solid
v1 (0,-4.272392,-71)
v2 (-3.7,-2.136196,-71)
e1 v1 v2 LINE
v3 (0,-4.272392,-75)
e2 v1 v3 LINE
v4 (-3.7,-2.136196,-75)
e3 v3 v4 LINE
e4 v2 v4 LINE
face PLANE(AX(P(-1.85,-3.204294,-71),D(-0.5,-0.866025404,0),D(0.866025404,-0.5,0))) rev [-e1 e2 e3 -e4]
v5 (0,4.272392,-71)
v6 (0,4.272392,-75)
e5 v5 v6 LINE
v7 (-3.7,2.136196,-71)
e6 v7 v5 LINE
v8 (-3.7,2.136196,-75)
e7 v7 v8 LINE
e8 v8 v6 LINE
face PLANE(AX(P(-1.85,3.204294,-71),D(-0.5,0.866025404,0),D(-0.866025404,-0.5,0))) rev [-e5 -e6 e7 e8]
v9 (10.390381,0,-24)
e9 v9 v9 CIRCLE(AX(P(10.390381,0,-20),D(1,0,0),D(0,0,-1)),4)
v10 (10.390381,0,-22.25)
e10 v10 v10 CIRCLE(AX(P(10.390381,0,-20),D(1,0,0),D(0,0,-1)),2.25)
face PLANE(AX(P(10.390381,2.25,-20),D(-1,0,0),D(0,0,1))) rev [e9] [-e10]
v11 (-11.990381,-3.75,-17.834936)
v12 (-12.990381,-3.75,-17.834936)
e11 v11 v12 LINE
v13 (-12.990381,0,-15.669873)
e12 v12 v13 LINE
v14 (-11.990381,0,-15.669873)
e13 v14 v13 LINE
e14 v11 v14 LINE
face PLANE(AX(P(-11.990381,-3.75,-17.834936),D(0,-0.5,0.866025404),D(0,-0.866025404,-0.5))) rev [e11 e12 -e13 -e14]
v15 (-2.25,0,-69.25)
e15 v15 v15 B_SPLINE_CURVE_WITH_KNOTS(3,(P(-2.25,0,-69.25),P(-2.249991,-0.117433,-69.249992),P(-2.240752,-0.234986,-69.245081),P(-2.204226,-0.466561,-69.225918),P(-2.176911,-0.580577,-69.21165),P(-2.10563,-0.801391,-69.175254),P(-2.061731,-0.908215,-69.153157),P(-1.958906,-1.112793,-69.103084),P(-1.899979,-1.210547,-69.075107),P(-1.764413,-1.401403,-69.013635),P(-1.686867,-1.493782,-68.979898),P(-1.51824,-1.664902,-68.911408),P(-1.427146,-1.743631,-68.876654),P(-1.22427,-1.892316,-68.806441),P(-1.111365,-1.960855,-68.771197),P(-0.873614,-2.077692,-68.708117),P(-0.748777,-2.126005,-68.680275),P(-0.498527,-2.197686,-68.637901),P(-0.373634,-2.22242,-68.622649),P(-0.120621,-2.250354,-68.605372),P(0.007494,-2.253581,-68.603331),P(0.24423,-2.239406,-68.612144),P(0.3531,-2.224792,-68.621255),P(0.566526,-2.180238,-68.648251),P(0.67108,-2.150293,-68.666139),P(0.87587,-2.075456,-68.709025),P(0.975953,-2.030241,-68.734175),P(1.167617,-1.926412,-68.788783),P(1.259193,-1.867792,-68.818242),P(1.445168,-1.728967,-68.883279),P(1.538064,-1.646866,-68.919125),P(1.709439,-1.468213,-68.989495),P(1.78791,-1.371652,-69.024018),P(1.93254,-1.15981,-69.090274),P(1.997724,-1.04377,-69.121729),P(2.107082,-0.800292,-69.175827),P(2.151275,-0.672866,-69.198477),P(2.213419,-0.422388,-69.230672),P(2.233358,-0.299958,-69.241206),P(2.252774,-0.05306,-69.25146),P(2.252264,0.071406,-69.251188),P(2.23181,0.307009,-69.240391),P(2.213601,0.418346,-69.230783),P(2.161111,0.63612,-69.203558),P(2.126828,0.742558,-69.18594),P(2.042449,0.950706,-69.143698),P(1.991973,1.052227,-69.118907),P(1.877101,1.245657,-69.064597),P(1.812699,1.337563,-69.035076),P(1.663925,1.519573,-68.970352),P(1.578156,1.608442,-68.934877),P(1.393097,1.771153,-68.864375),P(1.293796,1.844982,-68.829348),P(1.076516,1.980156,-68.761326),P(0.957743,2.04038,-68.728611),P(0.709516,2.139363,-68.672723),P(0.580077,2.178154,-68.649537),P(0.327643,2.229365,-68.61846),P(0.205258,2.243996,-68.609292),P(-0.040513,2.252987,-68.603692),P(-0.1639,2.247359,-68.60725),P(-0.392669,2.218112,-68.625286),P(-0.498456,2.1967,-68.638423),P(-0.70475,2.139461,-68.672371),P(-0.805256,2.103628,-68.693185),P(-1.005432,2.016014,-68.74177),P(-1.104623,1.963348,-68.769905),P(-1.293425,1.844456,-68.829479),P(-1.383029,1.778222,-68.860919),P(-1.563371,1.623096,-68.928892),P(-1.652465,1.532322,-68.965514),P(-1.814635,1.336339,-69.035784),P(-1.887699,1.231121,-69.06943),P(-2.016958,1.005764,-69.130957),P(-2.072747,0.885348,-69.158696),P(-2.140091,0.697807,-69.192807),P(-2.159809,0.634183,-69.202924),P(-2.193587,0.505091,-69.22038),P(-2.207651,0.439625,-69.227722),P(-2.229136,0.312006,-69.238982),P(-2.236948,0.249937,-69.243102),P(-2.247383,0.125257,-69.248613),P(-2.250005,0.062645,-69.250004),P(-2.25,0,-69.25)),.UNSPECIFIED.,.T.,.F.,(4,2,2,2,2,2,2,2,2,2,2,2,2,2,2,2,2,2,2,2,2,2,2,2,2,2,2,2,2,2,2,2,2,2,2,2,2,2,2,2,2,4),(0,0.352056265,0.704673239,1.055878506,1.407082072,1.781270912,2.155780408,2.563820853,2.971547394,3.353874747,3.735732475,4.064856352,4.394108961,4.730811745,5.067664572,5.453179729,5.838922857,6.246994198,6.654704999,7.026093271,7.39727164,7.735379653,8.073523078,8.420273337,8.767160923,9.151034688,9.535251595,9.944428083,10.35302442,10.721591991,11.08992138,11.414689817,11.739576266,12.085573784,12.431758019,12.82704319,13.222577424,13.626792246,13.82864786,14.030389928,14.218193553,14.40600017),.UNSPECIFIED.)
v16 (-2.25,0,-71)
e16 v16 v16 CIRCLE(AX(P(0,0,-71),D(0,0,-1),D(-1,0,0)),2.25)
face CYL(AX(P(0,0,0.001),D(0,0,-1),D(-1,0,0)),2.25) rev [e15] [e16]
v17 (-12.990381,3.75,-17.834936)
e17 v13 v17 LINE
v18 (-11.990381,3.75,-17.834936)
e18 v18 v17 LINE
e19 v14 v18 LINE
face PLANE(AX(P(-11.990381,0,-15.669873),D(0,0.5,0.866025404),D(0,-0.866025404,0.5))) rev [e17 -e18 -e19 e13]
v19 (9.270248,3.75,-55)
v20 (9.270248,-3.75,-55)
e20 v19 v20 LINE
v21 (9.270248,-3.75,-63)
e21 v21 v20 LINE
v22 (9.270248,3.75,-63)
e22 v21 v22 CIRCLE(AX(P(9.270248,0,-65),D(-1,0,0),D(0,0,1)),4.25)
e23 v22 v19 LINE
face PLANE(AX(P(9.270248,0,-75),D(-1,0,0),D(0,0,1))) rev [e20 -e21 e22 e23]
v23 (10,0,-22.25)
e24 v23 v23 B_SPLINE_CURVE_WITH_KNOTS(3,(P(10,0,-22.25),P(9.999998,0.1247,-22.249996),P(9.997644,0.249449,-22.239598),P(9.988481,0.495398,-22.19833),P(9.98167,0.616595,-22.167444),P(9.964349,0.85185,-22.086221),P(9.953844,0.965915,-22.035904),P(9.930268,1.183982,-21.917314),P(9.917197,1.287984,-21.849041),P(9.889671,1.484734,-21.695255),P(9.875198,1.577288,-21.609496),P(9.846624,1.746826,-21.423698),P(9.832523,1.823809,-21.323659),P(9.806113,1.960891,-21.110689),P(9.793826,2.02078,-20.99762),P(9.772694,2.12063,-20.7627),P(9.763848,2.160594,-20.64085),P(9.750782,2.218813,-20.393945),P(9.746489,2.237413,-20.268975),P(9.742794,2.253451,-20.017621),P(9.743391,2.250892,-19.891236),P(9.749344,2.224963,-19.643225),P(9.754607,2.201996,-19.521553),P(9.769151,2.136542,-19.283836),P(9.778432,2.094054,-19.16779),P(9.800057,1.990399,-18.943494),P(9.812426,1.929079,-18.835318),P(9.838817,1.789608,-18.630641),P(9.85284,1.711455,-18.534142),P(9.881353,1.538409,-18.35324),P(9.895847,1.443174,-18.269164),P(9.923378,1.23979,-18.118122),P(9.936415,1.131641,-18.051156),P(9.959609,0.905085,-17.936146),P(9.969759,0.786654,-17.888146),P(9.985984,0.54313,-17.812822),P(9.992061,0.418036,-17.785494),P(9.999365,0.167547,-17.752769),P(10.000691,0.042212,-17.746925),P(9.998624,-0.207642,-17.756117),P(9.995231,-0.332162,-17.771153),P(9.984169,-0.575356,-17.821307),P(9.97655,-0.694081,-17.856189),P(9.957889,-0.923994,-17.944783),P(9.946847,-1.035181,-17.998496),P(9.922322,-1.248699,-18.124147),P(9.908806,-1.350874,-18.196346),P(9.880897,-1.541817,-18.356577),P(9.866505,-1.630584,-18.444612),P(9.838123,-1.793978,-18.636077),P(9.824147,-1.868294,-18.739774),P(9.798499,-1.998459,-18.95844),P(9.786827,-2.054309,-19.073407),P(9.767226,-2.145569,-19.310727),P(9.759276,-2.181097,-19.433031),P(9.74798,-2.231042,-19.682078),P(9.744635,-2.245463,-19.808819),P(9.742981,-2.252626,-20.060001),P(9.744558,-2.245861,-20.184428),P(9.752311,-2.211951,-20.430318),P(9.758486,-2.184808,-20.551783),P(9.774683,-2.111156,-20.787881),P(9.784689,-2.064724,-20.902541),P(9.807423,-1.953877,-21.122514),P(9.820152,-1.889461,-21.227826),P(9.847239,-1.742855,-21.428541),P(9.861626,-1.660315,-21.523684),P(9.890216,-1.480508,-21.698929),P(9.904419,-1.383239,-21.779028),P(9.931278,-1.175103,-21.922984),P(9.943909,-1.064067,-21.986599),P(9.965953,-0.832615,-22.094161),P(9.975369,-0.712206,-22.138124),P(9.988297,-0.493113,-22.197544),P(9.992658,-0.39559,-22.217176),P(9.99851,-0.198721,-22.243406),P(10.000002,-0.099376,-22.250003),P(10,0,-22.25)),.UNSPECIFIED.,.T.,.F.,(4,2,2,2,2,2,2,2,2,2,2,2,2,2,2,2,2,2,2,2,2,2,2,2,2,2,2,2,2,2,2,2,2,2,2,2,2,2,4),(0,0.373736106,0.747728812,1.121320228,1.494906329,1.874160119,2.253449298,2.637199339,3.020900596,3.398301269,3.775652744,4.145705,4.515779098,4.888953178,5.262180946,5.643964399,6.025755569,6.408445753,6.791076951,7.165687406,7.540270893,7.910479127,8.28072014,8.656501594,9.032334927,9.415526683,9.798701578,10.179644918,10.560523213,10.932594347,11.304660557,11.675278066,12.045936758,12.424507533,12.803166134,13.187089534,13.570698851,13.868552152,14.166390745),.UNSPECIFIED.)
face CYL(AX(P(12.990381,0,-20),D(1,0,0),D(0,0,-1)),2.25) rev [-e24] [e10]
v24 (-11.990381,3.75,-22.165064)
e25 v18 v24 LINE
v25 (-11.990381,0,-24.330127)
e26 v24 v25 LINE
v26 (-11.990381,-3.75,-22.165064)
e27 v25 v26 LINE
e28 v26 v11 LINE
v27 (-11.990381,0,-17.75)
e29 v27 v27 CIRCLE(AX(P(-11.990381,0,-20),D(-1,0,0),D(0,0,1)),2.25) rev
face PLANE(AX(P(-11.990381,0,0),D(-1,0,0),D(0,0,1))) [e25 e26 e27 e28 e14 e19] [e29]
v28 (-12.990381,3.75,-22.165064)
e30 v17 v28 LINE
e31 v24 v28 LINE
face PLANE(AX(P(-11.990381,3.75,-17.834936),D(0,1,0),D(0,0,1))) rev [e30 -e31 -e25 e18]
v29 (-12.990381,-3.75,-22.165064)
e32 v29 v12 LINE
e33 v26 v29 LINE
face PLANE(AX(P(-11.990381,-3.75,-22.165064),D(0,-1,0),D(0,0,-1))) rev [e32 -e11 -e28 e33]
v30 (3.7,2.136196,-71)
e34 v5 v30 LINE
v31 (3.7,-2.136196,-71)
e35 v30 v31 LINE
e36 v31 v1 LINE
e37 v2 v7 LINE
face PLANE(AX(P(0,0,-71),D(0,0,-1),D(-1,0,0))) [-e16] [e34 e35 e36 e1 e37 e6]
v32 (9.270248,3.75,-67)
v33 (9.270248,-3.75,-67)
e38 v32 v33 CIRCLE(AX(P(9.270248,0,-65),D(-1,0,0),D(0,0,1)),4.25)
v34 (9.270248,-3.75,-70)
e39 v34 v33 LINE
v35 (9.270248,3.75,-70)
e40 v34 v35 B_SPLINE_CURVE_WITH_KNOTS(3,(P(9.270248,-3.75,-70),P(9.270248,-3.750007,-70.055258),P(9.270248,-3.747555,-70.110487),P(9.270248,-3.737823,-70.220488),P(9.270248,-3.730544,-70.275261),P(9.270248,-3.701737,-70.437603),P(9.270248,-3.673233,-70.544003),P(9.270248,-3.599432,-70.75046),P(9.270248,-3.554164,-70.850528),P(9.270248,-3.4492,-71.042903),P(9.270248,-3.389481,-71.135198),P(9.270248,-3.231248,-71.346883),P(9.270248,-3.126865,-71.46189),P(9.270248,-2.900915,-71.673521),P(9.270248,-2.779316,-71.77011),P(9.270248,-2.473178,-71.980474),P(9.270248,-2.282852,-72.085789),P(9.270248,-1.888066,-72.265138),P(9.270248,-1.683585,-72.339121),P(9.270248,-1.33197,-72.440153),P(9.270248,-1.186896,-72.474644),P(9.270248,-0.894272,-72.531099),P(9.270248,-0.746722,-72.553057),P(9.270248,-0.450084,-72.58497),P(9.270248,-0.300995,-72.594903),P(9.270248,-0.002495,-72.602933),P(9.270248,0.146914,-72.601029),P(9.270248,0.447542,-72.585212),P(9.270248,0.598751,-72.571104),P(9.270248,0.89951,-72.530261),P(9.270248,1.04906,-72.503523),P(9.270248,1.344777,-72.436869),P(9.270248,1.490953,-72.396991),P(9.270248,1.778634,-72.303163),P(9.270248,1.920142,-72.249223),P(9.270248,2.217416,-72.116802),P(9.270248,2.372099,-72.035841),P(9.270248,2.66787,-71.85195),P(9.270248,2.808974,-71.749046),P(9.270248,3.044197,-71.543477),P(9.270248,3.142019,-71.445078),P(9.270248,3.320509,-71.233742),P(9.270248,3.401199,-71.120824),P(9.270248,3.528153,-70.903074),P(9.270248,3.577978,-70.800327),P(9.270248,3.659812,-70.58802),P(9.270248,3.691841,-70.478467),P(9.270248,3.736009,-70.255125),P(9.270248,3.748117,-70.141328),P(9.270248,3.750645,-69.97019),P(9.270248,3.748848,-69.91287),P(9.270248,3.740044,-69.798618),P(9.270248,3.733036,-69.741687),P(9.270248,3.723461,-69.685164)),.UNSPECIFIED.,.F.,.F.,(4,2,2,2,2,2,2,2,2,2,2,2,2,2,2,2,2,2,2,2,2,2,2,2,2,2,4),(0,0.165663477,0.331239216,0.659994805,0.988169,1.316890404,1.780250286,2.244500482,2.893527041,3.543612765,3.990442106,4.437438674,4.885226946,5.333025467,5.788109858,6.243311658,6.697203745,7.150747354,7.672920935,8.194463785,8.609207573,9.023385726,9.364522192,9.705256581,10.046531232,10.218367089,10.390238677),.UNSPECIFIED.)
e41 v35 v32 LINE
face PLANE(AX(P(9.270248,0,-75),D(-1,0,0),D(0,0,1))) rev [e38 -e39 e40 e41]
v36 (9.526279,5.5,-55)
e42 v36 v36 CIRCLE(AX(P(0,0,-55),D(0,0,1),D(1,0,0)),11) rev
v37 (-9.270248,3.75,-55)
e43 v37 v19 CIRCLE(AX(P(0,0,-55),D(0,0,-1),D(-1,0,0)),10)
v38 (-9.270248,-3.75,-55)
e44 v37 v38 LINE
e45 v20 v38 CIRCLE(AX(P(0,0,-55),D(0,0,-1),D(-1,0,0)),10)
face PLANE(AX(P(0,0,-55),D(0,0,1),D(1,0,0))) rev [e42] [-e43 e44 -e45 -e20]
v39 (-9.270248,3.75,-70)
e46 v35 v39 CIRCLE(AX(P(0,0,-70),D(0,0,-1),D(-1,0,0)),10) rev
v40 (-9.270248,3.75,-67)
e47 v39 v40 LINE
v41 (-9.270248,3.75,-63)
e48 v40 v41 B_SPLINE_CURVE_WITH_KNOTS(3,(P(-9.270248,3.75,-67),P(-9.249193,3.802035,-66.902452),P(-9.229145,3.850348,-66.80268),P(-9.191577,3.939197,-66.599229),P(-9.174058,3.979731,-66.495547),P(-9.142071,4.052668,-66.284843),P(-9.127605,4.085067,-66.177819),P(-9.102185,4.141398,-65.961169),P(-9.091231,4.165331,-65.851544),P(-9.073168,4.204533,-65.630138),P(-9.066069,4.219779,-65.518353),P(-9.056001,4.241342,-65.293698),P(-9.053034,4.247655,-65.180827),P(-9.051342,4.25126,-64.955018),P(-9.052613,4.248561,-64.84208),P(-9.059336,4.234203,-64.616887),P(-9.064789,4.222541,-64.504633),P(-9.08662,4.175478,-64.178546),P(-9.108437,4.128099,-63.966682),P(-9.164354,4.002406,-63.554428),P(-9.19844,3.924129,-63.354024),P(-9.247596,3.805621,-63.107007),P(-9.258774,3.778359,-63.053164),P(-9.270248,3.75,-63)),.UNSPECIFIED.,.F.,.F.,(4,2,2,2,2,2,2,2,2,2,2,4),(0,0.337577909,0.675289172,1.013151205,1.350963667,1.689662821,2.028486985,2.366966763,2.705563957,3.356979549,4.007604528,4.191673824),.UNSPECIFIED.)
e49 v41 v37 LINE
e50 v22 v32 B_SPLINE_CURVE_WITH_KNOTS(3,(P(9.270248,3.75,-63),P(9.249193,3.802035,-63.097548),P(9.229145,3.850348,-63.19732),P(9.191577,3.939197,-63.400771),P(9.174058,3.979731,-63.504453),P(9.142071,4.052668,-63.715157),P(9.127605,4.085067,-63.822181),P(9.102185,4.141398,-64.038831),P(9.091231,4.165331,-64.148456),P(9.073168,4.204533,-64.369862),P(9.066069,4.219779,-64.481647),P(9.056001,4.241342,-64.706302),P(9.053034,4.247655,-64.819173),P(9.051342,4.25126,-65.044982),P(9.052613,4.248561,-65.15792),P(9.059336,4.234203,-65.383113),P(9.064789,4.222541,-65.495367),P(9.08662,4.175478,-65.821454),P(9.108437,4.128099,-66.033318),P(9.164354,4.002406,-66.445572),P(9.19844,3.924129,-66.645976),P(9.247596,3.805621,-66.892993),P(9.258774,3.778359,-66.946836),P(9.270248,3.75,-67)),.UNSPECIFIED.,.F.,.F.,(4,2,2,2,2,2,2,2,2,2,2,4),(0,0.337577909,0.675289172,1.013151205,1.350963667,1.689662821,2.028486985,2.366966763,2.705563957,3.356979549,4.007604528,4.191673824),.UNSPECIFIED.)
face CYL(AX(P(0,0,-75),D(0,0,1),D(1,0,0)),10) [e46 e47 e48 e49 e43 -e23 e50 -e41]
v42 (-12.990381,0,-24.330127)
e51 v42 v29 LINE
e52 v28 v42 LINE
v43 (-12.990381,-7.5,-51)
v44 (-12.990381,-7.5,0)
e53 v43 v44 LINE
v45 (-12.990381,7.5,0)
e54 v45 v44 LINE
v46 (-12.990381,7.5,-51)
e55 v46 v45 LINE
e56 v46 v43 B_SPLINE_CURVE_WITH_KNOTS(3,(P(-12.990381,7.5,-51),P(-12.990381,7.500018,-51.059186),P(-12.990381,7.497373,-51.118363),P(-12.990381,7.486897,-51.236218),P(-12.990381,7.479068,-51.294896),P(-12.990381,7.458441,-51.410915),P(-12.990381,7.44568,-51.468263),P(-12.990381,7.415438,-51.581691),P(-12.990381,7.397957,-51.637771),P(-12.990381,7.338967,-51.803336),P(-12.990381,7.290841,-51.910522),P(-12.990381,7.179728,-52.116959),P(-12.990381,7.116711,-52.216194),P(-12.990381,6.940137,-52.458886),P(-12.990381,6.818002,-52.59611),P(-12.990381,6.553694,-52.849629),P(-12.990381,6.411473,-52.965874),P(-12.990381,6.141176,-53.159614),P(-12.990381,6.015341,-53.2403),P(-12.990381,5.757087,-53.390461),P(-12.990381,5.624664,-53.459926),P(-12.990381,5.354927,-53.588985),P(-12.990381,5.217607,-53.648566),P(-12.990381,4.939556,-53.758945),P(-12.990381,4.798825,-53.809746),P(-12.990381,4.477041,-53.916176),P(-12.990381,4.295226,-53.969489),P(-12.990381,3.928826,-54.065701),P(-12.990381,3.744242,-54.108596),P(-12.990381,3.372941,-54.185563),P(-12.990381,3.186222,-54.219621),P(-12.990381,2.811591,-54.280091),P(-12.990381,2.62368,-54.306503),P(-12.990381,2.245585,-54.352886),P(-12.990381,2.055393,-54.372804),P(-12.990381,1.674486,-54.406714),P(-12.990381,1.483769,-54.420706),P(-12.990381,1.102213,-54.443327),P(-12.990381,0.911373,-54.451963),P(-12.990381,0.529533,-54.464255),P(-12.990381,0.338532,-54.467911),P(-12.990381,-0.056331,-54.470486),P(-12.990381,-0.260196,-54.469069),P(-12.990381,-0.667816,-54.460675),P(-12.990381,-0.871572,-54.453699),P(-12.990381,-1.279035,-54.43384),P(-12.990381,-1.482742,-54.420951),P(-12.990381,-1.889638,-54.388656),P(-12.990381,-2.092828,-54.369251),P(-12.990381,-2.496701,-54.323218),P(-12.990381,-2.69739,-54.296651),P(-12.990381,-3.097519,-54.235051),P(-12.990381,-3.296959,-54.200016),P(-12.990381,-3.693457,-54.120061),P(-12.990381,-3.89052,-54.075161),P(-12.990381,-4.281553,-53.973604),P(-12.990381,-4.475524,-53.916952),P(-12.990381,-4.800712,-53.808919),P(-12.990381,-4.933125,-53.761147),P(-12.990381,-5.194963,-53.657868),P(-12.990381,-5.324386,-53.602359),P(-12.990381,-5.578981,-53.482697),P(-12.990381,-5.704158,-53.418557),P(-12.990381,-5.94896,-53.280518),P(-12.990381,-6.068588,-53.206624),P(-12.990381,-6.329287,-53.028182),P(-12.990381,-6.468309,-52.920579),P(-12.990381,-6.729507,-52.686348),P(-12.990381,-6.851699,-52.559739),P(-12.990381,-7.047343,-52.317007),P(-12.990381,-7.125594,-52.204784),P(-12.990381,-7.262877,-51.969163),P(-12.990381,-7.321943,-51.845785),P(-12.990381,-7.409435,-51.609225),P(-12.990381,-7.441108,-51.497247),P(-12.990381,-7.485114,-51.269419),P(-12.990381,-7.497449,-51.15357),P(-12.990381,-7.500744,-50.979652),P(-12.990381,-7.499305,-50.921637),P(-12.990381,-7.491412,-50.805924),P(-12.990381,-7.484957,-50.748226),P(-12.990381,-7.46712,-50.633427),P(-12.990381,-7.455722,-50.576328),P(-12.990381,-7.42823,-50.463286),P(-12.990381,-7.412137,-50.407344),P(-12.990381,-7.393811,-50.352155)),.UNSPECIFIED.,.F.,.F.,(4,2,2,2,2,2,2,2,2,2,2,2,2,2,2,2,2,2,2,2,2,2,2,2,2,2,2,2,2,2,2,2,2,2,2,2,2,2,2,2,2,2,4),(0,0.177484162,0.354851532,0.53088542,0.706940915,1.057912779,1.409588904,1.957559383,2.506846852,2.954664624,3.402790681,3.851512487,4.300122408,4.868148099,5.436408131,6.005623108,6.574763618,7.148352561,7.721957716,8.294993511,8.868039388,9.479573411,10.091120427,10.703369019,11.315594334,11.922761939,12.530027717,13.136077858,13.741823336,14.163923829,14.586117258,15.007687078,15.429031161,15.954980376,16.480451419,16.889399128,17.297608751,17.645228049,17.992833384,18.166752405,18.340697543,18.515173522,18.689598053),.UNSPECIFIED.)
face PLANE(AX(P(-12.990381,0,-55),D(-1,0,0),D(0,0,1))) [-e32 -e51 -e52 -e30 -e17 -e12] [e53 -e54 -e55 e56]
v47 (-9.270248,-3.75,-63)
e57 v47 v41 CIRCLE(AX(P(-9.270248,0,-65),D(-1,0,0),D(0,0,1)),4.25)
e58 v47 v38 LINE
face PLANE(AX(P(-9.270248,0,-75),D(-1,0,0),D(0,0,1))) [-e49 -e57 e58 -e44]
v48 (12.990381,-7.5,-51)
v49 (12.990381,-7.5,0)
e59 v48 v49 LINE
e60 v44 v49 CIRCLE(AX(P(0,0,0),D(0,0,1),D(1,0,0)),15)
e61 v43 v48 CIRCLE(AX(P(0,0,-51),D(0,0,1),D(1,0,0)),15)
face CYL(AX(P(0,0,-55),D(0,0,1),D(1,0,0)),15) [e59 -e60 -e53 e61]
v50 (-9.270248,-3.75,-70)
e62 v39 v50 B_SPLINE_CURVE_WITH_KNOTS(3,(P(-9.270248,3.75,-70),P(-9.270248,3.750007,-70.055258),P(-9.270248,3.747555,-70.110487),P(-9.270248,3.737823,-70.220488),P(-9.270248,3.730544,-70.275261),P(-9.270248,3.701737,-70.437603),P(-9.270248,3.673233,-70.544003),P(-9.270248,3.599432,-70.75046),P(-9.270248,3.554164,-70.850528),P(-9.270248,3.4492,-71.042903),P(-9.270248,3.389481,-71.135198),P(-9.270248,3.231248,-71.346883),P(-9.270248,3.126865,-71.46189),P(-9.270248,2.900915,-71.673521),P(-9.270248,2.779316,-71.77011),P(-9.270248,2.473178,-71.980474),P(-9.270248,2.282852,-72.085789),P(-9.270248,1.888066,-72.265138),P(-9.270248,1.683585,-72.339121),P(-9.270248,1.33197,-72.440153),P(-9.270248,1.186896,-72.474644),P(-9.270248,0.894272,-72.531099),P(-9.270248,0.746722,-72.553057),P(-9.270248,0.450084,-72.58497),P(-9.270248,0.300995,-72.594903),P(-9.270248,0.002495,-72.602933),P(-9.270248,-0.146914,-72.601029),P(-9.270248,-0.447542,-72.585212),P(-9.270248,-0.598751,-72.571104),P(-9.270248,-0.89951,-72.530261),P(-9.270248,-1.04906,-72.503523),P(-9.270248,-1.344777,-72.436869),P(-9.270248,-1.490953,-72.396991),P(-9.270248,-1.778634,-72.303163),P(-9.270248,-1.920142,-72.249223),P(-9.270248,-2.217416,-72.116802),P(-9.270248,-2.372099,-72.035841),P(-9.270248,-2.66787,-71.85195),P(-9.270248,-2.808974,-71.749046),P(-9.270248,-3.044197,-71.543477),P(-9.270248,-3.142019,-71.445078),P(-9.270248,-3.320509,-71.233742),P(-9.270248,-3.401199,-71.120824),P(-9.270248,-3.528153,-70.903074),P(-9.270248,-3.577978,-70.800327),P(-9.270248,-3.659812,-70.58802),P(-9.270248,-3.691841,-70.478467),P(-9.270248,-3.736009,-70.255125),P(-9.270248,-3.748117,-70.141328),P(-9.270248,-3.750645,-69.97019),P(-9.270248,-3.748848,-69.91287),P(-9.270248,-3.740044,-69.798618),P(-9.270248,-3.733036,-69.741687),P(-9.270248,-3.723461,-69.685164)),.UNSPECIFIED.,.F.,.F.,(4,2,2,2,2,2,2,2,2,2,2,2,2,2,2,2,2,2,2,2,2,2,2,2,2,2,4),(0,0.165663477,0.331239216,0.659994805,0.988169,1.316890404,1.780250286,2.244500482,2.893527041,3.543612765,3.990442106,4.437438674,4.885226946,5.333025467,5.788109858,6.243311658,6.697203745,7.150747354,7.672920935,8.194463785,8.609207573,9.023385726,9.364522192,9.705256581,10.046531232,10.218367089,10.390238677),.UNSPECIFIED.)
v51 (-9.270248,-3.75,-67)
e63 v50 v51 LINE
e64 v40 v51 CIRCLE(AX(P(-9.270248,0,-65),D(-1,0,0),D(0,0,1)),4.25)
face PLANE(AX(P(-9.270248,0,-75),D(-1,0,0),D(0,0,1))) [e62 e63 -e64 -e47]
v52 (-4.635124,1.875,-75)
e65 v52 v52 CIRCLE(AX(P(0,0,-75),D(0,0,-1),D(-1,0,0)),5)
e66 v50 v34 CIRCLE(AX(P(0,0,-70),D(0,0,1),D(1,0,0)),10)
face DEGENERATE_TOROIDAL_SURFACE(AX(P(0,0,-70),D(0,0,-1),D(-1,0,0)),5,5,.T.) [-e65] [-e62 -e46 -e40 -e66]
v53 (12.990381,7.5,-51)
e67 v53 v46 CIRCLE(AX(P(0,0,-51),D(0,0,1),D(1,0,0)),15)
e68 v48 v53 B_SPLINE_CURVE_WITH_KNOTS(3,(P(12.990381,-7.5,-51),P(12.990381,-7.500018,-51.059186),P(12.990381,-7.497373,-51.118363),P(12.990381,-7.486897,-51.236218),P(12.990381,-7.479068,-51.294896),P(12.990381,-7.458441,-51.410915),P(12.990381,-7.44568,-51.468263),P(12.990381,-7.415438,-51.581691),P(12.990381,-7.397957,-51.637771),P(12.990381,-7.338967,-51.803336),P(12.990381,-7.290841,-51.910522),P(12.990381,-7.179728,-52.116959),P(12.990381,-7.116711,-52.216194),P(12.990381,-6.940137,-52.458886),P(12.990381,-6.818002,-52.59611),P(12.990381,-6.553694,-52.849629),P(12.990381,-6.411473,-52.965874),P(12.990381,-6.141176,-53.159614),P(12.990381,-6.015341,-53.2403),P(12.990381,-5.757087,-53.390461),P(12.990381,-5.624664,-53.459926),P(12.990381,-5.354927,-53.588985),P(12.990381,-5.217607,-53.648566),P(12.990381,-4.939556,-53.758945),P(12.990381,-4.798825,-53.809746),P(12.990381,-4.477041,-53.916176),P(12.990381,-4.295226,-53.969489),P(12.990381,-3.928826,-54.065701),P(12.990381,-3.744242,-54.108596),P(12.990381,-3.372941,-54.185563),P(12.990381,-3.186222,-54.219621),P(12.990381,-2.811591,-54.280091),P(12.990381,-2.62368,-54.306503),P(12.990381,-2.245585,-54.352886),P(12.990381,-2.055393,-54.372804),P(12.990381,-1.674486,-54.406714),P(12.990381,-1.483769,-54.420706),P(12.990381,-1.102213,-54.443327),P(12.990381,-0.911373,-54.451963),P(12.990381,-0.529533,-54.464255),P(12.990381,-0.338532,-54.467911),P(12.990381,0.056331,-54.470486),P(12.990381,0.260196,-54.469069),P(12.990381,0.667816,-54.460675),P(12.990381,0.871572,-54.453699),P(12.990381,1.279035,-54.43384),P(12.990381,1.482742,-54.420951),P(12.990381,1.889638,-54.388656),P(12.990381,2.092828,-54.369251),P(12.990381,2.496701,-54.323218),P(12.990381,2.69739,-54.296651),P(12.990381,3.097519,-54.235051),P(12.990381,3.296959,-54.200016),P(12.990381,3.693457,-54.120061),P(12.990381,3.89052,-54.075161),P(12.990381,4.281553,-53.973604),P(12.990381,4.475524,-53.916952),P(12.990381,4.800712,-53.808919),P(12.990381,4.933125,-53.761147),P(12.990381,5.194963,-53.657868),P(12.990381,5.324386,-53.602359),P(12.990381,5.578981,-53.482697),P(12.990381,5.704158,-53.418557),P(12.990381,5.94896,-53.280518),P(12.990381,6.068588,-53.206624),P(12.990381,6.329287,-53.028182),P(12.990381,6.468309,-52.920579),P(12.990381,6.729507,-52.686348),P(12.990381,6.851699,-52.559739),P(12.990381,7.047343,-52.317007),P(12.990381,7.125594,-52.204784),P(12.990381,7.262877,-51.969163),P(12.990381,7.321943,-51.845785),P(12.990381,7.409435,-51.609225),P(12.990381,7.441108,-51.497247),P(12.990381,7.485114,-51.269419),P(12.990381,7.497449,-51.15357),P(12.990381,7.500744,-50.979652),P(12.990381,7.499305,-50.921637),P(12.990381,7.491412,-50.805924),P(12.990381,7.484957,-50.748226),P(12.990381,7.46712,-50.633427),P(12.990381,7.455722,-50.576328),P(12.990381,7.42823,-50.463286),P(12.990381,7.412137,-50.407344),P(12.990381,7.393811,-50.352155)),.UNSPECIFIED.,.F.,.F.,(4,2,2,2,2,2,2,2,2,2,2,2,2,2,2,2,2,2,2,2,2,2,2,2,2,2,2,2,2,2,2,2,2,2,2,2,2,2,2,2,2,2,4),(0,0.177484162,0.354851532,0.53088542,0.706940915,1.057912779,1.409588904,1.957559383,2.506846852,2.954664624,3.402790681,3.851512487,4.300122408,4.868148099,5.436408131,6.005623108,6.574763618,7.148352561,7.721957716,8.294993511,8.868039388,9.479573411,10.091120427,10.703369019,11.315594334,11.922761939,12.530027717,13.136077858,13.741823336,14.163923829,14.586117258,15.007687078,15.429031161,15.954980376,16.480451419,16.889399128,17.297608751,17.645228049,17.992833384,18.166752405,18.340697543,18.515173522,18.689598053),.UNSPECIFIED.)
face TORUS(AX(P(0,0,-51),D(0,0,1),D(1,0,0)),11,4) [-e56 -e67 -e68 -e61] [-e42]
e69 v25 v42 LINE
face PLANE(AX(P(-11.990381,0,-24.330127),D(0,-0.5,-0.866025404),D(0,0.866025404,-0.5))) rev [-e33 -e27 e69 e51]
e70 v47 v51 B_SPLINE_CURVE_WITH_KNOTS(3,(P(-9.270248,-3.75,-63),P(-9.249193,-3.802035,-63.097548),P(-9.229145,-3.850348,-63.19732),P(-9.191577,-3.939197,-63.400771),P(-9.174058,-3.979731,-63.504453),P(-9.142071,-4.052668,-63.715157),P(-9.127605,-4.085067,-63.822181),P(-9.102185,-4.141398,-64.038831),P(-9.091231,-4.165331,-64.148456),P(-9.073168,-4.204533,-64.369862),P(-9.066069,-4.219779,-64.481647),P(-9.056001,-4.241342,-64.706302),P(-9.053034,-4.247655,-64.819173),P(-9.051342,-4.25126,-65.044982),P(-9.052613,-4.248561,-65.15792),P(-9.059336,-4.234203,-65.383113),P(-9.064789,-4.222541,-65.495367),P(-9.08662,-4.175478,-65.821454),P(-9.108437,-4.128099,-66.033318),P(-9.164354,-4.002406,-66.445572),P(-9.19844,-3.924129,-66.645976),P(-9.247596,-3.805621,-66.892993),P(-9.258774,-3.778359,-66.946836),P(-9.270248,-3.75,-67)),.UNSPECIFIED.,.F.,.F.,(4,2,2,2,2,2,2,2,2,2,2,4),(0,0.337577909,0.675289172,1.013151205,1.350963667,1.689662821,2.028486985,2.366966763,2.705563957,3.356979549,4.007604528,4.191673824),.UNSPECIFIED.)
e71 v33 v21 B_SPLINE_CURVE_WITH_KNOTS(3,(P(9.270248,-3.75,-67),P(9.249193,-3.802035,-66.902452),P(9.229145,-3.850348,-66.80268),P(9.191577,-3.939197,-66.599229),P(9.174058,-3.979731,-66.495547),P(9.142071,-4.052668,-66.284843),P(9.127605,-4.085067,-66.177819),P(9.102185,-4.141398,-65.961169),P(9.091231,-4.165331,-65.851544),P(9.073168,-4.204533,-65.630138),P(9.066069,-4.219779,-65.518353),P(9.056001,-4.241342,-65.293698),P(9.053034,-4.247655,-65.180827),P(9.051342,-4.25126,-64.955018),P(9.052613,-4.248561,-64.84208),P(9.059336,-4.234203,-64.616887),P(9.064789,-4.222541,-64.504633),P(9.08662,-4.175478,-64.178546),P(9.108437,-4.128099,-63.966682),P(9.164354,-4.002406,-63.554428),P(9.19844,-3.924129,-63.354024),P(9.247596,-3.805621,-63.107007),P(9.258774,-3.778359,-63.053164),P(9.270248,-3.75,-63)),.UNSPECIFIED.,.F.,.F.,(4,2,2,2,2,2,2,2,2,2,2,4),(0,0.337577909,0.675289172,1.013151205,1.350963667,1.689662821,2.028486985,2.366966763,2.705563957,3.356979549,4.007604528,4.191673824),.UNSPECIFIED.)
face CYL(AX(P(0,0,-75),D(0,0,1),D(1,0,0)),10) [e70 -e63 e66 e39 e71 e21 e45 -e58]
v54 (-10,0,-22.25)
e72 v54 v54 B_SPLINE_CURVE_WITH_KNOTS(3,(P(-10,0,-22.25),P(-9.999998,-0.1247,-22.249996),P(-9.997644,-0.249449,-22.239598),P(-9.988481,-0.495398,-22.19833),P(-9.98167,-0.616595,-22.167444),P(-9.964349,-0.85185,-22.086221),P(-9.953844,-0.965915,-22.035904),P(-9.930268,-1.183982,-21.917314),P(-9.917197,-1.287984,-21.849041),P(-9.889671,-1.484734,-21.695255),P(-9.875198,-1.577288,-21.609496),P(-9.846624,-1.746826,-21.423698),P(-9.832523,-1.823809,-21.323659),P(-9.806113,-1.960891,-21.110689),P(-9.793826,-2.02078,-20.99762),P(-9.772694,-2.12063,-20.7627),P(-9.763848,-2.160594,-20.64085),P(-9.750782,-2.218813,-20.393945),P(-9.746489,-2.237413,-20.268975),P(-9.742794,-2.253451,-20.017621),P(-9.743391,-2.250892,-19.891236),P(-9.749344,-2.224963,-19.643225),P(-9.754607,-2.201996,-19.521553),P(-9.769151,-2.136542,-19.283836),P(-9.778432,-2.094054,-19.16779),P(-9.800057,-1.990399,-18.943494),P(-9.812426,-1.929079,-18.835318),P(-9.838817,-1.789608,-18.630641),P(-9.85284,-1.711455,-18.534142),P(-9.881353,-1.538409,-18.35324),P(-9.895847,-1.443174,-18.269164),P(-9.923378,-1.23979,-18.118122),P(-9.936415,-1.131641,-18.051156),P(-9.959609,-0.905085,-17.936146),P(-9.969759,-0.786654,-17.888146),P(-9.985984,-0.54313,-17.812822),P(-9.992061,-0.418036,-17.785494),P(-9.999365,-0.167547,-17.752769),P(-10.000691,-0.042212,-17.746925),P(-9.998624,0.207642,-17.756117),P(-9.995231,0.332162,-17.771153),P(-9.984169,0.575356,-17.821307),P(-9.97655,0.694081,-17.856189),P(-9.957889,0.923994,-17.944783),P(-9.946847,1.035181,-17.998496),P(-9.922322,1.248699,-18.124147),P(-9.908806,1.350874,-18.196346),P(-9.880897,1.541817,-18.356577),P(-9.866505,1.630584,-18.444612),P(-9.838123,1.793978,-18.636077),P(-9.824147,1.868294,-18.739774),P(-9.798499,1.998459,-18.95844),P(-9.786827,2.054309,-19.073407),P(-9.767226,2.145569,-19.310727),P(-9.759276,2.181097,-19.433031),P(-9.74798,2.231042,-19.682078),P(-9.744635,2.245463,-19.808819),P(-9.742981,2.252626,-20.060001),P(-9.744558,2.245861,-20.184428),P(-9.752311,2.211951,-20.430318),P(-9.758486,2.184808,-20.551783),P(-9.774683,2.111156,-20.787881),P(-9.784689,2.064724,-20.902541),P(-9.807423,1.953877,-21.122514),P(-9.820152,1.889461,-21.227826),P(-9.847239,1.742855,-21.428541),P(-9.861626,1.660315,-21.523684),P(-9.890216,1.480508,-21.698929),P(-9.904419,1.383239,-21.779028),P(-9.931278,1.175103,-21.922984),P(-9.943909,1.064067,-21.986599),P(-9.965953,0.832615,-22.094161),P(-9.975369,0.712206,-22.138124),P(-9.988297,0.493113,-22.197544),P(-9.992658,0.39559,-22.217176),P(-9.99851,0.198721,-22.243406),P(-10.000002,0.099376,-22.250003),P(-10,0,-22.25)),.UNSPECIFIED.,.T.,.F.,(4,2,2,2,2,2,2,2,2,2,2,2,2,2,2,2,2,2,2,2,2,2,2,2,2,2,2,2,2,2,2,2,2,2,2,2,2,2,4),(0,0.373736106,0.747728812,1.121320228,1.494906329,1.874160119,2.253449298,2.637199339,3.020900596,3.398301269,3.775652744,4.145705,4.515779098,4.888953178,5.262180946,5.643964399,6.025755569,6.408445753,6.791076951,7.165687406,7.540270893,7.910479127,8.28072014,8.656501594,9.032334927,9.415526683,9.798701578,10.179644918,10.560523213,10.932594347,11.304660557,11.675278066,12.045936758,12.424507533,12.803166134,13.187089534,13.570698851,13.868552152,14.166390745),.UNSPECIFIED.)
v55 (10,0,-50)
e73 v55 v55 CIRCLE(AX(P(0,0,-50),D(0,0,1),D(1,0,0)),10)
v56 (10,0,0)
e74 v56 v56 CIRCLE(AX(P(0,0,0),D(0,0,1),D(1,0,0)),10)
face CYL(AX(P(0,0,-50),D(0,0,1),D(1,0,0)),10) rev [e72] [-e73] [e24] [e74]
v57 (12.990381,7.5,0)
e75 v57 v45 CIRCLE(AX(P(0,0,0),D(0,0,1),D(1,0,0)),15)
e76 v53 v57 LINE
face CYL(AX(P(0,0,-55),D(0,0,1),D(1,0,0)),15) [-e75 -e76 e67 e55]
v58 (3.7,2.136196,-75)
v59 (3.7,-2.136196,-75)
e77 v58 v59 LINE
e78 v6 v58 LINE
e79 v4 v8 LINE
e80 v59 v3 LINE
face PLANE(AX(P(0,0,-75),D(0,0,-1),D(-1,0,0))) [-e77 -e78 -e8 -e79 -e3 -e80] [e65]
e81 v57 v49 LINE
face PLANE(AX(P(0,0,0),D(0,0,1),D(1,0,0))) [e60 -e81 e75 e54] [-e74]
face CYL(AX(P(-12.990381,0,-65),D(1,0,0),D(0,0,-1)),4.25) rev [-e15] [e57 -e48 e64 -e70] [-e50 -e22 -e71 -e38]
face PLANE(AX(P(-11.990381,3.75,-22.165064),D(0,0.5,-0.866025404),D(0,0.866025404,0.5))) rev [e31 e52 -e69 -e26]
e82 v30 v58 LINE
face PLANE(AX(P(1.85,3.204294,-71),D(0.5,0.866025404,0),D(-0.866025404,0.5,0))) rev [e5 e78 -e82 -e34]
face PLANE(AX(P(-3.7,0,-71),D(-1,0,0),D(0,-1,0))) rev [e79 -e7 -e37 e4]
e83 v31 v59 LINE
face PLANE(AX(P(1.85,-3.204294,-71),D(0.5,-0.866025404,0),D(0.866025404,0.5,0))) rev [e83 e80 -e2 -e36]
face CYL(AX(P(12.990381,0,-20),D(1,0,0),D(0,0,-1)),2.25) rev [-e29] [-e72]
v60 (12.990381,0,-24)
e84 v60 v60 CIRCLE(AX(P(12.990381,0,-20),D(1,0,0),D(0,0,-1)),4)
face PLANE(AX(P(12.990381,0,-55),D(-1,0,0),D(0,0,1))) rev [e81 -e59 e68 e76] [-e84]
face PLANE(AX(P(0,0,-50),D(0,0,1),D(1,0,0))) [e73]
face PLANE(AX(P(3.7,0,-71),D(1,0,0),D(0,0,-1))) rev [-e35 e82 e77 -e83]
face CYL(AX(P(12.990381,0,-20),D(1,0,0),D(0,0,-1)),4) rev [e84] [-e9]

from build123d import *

# Parameters (mm, degrees)
BOSS_EXTRUDE2_DEPTH                         = 55
BOSS_EXTRUDE4_DEPTH                         = 20
CUT_EXTRUDE4_DEPTH                          = 78.580603246
CUT_EXTRUDE4_DEPTH_BACK                     = 78.580603246
SKETCH7_R                                   = 4.25
CUT_EXTRUDE5_REACH                          = 79.581
CUT_EXTRUDE5_END_RADIUS                     = 4.25
SKETCH8_R                                   = 2.25
CUT_EXTRUDE6_DEPTH                          = 4
SKETCH2_5_R                                 = 10
CUT_EXTRUDE7_DEPTH                          = 50
FILLET1_R                                   = 4
FILLET3_R                                   = 5
CBORE_FOR_M4_CHEESE_HEAD_SCREW1_D           = 4.5
CBORE_FOR_M4_CHEESE_HEAD_SCREW1_CBORE_D     = 8
CBORE_FOR_M4_CHEESE_HEAD_SCREW1_CBORE_DEPTH = 2.6
CUT_EXTRUDE8_DEPTH                          = 1


with BuildPart() as part:
    # Sketch2 → Boss-Extrude2 (new body)
    with BuildSketch(Plane.XY):
        with BuildLine():
            Line((12.990381057, -7.5), (12.990381057, 7.5))
            ThreePointArc((12.990381057, 7.5), (0, 15), (-12.990381057, 7.5))
            Line((-12.990381057, 7.5), (-12.990381057, -7.5))
            ThreePointArc((-12.990381057, -7.5), (0, -15), (12.990381057, -7.5))
        make_face()
    extrude(amount=-BOSS_EXTRUDE2_DEPTH)

    # Sketch6 → Boss-Extrude4 (add)
    with BuildSketch(Plane(origin=(0, 0, -55), x_dir=(-1, 0, 0), z_dir=(0, 0, -1))):
        with BuildLine():
            ThreePointArc((9.270248109, 3.75), (0, 10), (-9.270248109, 3.75))
            Line((-9.270248109, 3.75), (-9.270248109, -3.75))
            ThreePointArc((-9.270248109, -3.75), (0, -10), (9.270248109, -3.75))
            Line((9.270248109, -3.75), (9.270248109, 3.75))
        make_face()
    extrude(amount=BOSS_EXTRUDE4_DEPTH)

    # Sketch7 → Cut-Extrude4 (cut, two sides: drawn at the far end of the back side and taken through both)
    with BuildSketch(Plane(origin=(0, 0, 0), x_dir=(0, 0, -1), z_dir=(1, 0, 0)).offset(-CUT_EXTRUDE4_DEPTH_BACK)):
        with Locations(Location((65, 0, 0), (0, 0, 298.072486936))):
            Circle(SKETCH7_R)
    extrude(amount=CUT_EXTRUDE4_DEPTH + CUT_EXTRUDE4_DEPTH_BACK, mode=Mode.SUBTRACT)

    # Cut-Extrude5: up to this cylinder (the profile starts outside it)
    cut_extrude5_end = Plane(origin=(0, 0, -65), z_dir=(1, 0, 0)) * Cylinder(CUT_EXTRUDE5_END_RADIUS, 168.662, mode=Mode.PRIVATE)
    # Sketch8 → Cut-Extrude5 (cut, up to the surface)
    with BuildSketch(Plane(origin=(0, 0, -75), x_dir=(-1, 0, 0), z_dir=(0, 0, -1)), mode=Mode.PRIVATE) as cut_extrude5_sk1:
        Circle(SKETCH8_R)
    cut_extrude5_tool1 = extrude(cut_extrude5_sk1.sketch, amount=-CUT_EXTRUDE5_REACH, mode=Mode.PRIVATE) - cut_extrude5_end
    add(cut_extrude5_tool1.solids().sort_by_distance((0, 0, -75))[0], mode=Mode.SUBTRACT)

    # Sketch8<3> → Cut-Extrude6 (cut)
    with BuildSketch(Plane(origin=(0, 0, -75), x_dir=(-1, 0, 0), z_dir=(0, 0, -1))):
        Polygon((3.7, -2.136195996), (3.7, 2.136195996), (0, 4.272391992), (-3.7, 2.136195996), (-3.7, -2.136195996), (0, -4.272391992), align=None)
    extrude(amount=-CUT_EXTRUDE6_DEPTH, mode=Mode.SUBTRACT)

    # Sketch2<5> → Cut-Extrude7 (cut)
    with BuildSketch(Plane.XY):
        Circle(SKETCH2_5_R)
    extrude(amount=-CUT_EXTRUDE7_DEPTH, mode=Mode.SUBTRACT)

    # Fillet1
    # the kernel refuses this fillet: 4 mm, written as the material it takes off along each edge
    with BuildSketch(Plane(origin=(0, 0, -55), x_dir=(-0.9897152245182474, 0.1430516492627579, 0), z_dir=(0.1430516492627579, 0.9897152245182474, 0))) as fillet1_piece_1:
        with BuildLine():
            CenterArc((15 - FILLET1_R, FILLET1_R), FILLET1_R, 270, 90)
            Line((15 - FILLET1_R, 0), (15, 0))
            Line((15, 0), (15, FILLET1_R))
        make_face()
    revolve(axis=Axis((0, 0, -55), (0, 0, 1)), revolution_arc=196.448941493, mode=Mode.SUBTRACT)
    with BuildSketch(Plane(origin=(0, 0, -55), x_dir=(0.9897152245182473, -0.14305164926275812, 0), z_dir=(-0.14305164926275812, -0.9897152245182473, 0))) as fillet1_piece_2:
        with BuildLine():
            CenterArc((15 - FILLET1_R, FILLET1_R), FILLET1_R, 270, 90)
            Line((15 - FILLET1_R, 0), (15, 0))
            Line((15, 0), (15, FILLET1_R))
        make_face()
    revolve(axis=Axis((0, 0, -55), (0, 0, 1)), revolution_arc=196.448941493, mode=Mode.SUBTRACT)

    # Fillet3
    # the kernel refuses this fillet: 5 mm, written as the material it takes off along each edge
    with BuildSketch(Plane(origin=(0, 0, -75), x_dir=(-0.647307646342804, -0.7622288442365189, 0), z_dir=(0.7622288442365189, -0.647307646342804, 0))) as fillet3_piece_1:
        with BuildLine():
            CenterArc((10 - FILLET3_R, -FILLET3_R), FILLET3_R, 0, 90)
            Line((10, -FILLET3_R), (10, 0))
            Line((10, 0), (10 - FILLET3_R, 0))
        make_face()
    revolve(axis=Axis((0, 0, -75), (0, 0, -1)), revolution_arc=279.32216765, mode=Mode.SUBTRACT)
    with BuildSketch(Plane(origin=(0, 0, -75), x_dir=(0.6473076463428042, 0.7622288442365188, 0), z_dir=(-0.7622288442365188, 0.6473076463428042, 0))) as fillet3_piece_2:
        with BuildLine():
            CenterArc((10 - FILLET3_R, -FILLET3_R), FILLET3_R, 0, 90)
            Line((10, -FILLET3_R), (10, 0))
            Line((10, 0), (10 - FILLET3_R, 0))
        make_face()
    revolve(axis=Axis((0, 0, -75), (0, 0, -1)), revolution_arc=279.32216765, mode=Mode.SUBTRACT)

    # CBORE for M4 Cheese Head Screw1 (through all)
    with Locations(Plane(origin=(12.990381057, 0, 0), x_dir=(0, 0, -1), z_dir=(1, 0, 0))):
        with Locations((20, 0)):
            CounterBoreHole(CBORE_FOR_M4_CHEESE_HEAD_SCREW1_D / 2, CBORE_FOR_M4_CHEESE_HEAD_SCREW1_CBORE_D / 2, CBORE_FOR_M4_CHEESE_HEAD_SCREW1_CBORE_DEPTH)

    # Sketch9 → Cut-Extrude8 (cut)
    with BuildSketch(Plane.ZY.offset(12.990381057)):
        Polygon((-15.669872981, 0), (-17.834936491, 3.75), (-22.165063509, 3.75), (-24.330127019, 0), (-22.165063509, -3.75), (-17.834936491, -3.75), align=None)
    extrude(amount=-CUT_EXTRUDE8_DEPTH, mode=Mode.SUBTRACT)


solid = part.part
